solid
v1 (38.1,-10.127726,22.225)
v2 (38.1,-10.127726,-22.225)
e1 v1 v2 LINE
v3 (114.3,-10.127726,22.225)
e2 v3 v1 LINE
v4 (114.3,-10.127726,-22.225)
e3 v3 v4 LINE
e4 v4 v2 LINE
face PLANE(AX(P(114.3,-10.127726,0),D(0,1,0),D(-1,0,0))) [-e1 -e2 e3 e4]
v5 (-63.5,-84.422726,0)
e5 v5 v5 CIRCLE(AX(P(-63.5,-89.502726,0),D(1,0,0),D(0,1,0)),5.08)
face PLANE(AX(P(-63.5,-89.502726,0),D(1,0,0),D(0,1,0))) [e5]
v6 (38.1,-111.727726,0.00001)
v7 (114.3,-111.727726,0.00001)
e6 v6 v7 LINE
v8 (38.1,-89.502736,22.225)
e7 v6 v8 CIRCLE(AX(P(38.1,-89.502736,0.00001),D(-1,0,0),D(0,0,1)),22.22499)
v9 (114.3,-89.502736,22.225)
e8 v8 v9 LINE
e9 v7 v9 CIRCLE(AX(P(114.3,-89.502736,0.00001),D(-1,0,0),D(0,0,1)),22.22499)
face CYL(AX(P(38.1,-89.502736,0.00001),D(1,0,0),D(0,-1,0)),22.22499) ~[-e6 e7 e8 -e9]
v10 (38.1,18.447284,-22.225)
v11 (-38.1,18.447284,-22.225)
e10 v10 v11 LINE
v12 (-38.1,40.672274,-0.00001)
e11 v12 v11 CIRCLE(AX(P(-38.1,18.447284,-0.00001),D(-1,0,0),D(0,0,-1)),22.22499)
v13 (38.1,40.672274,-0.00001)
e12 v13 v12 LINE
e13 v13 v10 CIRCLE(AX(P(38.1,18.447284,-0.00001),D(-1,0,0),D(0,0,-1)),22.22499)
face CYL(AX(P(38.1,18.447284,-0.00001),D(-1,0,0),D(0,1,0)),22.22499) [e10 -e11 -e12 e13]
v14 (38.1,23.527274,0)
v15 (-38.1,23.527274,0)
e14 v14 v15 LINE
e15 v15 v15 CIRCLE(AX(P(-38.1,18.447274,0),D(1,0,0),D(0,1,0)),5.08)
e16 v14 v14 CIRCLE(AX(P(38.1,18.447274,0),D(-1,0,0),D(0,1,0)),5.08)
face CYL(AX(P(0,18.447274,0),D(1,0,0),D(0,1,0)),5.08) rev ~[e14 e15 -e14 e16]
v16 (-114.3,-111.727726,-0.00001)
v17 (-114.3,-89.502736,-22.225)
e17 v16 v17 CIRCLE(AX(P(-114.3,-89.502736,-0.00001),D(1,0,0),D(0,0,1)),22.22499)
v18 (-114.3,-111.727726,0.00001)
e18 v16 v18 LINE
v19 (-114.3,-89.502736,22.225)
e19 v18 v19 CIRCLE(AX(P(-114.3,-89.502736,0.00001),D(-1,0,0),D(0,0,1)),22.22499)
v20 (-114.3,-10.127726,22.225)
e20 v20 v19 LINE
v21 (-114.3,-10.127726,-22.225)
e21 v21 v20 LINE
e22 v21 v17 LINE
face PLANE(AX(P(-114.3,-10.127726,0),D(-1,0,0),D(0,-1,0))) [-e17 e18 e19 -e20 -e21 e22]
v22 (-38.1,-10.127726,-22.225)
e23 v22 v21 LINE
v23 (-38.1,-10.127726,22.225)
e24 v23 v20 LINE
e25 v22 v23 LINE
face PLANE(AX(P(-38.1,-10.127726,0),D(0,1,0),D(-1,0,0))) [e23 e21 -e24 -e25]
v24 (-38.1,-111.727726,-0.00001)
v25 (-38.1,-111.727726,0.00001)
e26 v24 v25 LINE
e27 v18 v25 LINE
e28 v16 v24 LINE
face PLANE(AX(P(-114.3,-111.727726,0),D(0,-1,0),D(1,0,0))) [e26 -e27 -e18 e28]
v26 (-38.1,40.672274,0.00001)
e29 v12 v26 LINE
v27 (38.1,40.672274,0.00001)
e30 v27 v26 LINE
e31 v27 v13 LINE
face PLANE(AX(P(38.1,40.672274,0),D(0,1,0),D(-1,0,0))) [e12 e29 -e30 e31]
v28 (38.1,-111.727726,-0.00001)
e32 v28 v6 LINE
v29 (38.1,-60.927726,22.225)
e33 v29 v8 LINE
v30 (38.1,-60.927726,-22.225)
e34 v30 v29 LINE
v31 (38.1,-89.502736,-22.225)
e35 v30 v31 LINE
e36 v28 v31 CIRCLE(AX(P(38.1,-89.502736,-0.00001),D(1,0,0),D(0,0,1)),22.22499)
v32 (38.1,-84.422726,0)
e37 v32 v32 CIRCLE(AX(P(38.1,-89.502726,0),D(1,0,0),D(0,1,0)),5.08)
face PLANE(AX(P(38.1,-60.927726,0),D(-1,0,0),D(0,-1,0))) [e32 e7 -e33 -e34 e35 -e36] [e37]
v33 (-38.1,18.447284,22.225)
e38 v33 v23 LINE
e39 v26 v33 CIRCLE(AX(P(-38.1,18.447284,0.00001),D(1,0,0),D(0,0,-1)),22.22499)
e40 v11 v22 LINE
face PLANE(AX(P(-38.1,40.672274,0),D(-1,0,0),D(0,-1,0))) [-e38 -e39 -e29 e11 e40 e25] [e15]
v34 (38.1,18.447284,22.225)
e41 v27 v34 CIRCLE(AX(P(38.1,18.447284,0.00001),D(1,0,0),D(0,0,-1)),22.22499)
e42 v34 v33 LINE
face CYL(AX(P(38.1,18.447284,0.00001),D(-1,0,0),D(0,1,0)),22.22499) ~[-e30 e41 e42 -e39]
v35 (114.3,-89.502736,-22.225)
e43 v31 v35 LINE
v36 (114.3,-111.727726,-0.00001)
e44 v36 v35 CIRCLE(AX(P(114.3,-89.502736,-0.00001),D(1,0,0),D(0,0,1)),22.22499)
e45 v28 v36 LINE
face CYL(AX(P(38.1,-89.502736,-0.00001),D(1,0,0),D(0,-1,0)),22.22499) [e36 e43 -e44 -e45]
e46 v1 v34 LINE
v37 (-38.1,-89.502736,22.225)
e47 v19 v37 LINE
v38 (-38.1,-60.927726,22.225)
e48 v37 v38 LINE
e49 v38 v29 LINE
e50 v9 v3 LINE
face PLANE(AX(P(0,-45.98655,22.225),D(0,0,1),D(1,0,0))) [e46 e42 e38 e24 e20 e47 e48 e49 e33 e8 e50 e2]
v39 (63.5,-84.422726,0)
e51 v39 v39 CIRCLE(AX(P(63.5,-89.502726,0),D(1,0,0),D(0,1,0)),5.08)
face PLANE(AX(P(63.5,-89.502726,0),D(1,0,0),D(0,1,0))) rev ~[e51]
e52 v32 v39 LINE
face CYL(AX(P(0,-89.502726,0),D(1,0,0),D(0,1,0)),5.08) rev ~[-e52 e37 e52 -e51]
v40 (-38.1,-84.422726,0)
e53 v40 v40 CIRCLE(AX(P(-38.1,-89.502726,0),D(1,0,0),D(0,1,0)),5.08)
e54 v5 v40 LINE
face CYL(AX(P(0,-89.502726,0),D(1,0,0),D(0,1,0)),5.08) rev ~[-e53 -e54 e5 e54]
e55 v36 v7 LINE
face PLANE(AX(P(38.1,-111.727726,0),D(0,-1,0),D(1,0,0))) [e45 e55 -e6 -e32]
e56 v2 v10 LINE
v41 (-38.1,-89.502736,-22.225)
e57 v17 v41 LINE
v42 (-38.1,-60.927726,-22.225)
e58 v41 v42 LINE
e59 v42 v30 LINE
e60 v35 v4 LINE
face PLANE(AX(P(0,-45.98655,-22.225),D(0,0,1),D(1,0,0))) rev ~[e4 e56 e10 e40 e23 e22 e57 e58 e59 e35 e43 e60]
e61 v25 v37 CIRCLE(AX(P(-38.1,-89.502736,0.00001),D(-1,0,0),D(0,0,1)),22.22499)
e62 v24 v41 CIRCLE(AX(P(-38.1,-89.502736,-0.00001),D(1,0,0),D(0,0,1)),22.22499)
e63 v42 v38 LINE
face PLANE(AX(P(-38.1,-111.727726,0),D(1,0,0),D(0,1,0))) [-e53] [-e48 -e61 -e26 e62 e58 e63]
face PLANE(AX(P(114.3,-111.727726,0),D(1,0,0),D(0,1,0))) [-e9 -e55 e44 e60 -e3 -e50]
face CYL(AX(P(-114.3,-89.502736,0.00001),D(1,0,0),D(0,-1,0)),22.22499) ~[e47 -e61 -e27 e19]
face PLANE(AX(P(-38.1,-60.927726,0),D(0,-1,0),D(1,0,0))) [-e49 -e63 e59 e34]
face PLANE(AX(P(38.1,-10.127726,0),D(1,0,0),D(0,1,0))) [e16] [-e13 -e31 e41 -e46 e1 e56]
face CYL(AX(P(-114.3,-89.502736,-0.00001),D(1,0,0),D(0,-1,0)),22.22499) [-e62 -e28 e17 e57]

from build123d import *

# Parameters (mm, degrees)
F1_DEPTH = 22.225
F2_R     = 22.22499
F3_R     = 5.08
F4_DEPTH = 114.301
F5_DEPTH = 114.301
F6_R     = 5.08
F7_DEPTH = 63.5


# Not quite as in the source:
# - a fillet or chamfer is up to 0.001 mm smaller than in the source, because OpenCascade refuses the exact size


with BuildPart() as f1:
    # F0 (on Top) → F1 (new body, symmetric)
    with BuildSketch(Plane.XY):
        Polygon((38.1, 40.6722736142), (0, 40.6722736142), (-38.1, 40.6722736142), (-38.1, -10.1277263858), (-114.3, -10.1277263858), (-114.3, -111.7277263858), (-38.1, -111.7277263858), (-38.1, -60.9277263858), (38.1, -60.9277263858), (38.1, -111.7277263858), (114.3, -111.7277263858), (114.3, -10.1277263858), (38.1, -10.1277263858), align=None)
    extrude(amount=F1_DEPTH, both=True)

    # F2 (radius 22.225 in the source; OpenCascade refuses exactly that, so slightly less here)
    f2_edges = [f1.edges().sort_by_distance(p)[0] for p in [
        (-76.2, -111.727726, 22.225),
        (-76.2, -111.727726, -22.225),
        (76.2, -111.727726, 22.225),
        (76.2, -111.727726, -22.225),
        (0, 40.672274, 22.225),
        (0, 40.672274, -22.225),
    ]]
    fillet(f2_edges, radius=F2_R)

    # F3 (on Right) → F4 (cut, through all)
    with BuildSketch(Plane.YZ):
        with Locations((18.4472736142, 0)):
            Circle(F3_R)
    extrude(amount=-F4_DEPTH, mode=Mode.SUBTRACT)

    # F3 (on Right) → F5 (cut, through all)
    with BuildSketch(Plane.YZ):
        with Locations((18.4472736142, 0)):
            Circle(F3_R)
    extrude(amount=F5_DEPTH, mode=Mode.SUBTRACT)

    # F6 (on Right) → F7 (cut, symmetric)
    with BuildSketch(Plane.YZ):
        with Locations((-89.5027263858, 0)):
            Circle(F6_R)
    extrude(amount=F7_DEPTH, both=True, mode=Mode.SUBTRACT)


solid = f1.part
